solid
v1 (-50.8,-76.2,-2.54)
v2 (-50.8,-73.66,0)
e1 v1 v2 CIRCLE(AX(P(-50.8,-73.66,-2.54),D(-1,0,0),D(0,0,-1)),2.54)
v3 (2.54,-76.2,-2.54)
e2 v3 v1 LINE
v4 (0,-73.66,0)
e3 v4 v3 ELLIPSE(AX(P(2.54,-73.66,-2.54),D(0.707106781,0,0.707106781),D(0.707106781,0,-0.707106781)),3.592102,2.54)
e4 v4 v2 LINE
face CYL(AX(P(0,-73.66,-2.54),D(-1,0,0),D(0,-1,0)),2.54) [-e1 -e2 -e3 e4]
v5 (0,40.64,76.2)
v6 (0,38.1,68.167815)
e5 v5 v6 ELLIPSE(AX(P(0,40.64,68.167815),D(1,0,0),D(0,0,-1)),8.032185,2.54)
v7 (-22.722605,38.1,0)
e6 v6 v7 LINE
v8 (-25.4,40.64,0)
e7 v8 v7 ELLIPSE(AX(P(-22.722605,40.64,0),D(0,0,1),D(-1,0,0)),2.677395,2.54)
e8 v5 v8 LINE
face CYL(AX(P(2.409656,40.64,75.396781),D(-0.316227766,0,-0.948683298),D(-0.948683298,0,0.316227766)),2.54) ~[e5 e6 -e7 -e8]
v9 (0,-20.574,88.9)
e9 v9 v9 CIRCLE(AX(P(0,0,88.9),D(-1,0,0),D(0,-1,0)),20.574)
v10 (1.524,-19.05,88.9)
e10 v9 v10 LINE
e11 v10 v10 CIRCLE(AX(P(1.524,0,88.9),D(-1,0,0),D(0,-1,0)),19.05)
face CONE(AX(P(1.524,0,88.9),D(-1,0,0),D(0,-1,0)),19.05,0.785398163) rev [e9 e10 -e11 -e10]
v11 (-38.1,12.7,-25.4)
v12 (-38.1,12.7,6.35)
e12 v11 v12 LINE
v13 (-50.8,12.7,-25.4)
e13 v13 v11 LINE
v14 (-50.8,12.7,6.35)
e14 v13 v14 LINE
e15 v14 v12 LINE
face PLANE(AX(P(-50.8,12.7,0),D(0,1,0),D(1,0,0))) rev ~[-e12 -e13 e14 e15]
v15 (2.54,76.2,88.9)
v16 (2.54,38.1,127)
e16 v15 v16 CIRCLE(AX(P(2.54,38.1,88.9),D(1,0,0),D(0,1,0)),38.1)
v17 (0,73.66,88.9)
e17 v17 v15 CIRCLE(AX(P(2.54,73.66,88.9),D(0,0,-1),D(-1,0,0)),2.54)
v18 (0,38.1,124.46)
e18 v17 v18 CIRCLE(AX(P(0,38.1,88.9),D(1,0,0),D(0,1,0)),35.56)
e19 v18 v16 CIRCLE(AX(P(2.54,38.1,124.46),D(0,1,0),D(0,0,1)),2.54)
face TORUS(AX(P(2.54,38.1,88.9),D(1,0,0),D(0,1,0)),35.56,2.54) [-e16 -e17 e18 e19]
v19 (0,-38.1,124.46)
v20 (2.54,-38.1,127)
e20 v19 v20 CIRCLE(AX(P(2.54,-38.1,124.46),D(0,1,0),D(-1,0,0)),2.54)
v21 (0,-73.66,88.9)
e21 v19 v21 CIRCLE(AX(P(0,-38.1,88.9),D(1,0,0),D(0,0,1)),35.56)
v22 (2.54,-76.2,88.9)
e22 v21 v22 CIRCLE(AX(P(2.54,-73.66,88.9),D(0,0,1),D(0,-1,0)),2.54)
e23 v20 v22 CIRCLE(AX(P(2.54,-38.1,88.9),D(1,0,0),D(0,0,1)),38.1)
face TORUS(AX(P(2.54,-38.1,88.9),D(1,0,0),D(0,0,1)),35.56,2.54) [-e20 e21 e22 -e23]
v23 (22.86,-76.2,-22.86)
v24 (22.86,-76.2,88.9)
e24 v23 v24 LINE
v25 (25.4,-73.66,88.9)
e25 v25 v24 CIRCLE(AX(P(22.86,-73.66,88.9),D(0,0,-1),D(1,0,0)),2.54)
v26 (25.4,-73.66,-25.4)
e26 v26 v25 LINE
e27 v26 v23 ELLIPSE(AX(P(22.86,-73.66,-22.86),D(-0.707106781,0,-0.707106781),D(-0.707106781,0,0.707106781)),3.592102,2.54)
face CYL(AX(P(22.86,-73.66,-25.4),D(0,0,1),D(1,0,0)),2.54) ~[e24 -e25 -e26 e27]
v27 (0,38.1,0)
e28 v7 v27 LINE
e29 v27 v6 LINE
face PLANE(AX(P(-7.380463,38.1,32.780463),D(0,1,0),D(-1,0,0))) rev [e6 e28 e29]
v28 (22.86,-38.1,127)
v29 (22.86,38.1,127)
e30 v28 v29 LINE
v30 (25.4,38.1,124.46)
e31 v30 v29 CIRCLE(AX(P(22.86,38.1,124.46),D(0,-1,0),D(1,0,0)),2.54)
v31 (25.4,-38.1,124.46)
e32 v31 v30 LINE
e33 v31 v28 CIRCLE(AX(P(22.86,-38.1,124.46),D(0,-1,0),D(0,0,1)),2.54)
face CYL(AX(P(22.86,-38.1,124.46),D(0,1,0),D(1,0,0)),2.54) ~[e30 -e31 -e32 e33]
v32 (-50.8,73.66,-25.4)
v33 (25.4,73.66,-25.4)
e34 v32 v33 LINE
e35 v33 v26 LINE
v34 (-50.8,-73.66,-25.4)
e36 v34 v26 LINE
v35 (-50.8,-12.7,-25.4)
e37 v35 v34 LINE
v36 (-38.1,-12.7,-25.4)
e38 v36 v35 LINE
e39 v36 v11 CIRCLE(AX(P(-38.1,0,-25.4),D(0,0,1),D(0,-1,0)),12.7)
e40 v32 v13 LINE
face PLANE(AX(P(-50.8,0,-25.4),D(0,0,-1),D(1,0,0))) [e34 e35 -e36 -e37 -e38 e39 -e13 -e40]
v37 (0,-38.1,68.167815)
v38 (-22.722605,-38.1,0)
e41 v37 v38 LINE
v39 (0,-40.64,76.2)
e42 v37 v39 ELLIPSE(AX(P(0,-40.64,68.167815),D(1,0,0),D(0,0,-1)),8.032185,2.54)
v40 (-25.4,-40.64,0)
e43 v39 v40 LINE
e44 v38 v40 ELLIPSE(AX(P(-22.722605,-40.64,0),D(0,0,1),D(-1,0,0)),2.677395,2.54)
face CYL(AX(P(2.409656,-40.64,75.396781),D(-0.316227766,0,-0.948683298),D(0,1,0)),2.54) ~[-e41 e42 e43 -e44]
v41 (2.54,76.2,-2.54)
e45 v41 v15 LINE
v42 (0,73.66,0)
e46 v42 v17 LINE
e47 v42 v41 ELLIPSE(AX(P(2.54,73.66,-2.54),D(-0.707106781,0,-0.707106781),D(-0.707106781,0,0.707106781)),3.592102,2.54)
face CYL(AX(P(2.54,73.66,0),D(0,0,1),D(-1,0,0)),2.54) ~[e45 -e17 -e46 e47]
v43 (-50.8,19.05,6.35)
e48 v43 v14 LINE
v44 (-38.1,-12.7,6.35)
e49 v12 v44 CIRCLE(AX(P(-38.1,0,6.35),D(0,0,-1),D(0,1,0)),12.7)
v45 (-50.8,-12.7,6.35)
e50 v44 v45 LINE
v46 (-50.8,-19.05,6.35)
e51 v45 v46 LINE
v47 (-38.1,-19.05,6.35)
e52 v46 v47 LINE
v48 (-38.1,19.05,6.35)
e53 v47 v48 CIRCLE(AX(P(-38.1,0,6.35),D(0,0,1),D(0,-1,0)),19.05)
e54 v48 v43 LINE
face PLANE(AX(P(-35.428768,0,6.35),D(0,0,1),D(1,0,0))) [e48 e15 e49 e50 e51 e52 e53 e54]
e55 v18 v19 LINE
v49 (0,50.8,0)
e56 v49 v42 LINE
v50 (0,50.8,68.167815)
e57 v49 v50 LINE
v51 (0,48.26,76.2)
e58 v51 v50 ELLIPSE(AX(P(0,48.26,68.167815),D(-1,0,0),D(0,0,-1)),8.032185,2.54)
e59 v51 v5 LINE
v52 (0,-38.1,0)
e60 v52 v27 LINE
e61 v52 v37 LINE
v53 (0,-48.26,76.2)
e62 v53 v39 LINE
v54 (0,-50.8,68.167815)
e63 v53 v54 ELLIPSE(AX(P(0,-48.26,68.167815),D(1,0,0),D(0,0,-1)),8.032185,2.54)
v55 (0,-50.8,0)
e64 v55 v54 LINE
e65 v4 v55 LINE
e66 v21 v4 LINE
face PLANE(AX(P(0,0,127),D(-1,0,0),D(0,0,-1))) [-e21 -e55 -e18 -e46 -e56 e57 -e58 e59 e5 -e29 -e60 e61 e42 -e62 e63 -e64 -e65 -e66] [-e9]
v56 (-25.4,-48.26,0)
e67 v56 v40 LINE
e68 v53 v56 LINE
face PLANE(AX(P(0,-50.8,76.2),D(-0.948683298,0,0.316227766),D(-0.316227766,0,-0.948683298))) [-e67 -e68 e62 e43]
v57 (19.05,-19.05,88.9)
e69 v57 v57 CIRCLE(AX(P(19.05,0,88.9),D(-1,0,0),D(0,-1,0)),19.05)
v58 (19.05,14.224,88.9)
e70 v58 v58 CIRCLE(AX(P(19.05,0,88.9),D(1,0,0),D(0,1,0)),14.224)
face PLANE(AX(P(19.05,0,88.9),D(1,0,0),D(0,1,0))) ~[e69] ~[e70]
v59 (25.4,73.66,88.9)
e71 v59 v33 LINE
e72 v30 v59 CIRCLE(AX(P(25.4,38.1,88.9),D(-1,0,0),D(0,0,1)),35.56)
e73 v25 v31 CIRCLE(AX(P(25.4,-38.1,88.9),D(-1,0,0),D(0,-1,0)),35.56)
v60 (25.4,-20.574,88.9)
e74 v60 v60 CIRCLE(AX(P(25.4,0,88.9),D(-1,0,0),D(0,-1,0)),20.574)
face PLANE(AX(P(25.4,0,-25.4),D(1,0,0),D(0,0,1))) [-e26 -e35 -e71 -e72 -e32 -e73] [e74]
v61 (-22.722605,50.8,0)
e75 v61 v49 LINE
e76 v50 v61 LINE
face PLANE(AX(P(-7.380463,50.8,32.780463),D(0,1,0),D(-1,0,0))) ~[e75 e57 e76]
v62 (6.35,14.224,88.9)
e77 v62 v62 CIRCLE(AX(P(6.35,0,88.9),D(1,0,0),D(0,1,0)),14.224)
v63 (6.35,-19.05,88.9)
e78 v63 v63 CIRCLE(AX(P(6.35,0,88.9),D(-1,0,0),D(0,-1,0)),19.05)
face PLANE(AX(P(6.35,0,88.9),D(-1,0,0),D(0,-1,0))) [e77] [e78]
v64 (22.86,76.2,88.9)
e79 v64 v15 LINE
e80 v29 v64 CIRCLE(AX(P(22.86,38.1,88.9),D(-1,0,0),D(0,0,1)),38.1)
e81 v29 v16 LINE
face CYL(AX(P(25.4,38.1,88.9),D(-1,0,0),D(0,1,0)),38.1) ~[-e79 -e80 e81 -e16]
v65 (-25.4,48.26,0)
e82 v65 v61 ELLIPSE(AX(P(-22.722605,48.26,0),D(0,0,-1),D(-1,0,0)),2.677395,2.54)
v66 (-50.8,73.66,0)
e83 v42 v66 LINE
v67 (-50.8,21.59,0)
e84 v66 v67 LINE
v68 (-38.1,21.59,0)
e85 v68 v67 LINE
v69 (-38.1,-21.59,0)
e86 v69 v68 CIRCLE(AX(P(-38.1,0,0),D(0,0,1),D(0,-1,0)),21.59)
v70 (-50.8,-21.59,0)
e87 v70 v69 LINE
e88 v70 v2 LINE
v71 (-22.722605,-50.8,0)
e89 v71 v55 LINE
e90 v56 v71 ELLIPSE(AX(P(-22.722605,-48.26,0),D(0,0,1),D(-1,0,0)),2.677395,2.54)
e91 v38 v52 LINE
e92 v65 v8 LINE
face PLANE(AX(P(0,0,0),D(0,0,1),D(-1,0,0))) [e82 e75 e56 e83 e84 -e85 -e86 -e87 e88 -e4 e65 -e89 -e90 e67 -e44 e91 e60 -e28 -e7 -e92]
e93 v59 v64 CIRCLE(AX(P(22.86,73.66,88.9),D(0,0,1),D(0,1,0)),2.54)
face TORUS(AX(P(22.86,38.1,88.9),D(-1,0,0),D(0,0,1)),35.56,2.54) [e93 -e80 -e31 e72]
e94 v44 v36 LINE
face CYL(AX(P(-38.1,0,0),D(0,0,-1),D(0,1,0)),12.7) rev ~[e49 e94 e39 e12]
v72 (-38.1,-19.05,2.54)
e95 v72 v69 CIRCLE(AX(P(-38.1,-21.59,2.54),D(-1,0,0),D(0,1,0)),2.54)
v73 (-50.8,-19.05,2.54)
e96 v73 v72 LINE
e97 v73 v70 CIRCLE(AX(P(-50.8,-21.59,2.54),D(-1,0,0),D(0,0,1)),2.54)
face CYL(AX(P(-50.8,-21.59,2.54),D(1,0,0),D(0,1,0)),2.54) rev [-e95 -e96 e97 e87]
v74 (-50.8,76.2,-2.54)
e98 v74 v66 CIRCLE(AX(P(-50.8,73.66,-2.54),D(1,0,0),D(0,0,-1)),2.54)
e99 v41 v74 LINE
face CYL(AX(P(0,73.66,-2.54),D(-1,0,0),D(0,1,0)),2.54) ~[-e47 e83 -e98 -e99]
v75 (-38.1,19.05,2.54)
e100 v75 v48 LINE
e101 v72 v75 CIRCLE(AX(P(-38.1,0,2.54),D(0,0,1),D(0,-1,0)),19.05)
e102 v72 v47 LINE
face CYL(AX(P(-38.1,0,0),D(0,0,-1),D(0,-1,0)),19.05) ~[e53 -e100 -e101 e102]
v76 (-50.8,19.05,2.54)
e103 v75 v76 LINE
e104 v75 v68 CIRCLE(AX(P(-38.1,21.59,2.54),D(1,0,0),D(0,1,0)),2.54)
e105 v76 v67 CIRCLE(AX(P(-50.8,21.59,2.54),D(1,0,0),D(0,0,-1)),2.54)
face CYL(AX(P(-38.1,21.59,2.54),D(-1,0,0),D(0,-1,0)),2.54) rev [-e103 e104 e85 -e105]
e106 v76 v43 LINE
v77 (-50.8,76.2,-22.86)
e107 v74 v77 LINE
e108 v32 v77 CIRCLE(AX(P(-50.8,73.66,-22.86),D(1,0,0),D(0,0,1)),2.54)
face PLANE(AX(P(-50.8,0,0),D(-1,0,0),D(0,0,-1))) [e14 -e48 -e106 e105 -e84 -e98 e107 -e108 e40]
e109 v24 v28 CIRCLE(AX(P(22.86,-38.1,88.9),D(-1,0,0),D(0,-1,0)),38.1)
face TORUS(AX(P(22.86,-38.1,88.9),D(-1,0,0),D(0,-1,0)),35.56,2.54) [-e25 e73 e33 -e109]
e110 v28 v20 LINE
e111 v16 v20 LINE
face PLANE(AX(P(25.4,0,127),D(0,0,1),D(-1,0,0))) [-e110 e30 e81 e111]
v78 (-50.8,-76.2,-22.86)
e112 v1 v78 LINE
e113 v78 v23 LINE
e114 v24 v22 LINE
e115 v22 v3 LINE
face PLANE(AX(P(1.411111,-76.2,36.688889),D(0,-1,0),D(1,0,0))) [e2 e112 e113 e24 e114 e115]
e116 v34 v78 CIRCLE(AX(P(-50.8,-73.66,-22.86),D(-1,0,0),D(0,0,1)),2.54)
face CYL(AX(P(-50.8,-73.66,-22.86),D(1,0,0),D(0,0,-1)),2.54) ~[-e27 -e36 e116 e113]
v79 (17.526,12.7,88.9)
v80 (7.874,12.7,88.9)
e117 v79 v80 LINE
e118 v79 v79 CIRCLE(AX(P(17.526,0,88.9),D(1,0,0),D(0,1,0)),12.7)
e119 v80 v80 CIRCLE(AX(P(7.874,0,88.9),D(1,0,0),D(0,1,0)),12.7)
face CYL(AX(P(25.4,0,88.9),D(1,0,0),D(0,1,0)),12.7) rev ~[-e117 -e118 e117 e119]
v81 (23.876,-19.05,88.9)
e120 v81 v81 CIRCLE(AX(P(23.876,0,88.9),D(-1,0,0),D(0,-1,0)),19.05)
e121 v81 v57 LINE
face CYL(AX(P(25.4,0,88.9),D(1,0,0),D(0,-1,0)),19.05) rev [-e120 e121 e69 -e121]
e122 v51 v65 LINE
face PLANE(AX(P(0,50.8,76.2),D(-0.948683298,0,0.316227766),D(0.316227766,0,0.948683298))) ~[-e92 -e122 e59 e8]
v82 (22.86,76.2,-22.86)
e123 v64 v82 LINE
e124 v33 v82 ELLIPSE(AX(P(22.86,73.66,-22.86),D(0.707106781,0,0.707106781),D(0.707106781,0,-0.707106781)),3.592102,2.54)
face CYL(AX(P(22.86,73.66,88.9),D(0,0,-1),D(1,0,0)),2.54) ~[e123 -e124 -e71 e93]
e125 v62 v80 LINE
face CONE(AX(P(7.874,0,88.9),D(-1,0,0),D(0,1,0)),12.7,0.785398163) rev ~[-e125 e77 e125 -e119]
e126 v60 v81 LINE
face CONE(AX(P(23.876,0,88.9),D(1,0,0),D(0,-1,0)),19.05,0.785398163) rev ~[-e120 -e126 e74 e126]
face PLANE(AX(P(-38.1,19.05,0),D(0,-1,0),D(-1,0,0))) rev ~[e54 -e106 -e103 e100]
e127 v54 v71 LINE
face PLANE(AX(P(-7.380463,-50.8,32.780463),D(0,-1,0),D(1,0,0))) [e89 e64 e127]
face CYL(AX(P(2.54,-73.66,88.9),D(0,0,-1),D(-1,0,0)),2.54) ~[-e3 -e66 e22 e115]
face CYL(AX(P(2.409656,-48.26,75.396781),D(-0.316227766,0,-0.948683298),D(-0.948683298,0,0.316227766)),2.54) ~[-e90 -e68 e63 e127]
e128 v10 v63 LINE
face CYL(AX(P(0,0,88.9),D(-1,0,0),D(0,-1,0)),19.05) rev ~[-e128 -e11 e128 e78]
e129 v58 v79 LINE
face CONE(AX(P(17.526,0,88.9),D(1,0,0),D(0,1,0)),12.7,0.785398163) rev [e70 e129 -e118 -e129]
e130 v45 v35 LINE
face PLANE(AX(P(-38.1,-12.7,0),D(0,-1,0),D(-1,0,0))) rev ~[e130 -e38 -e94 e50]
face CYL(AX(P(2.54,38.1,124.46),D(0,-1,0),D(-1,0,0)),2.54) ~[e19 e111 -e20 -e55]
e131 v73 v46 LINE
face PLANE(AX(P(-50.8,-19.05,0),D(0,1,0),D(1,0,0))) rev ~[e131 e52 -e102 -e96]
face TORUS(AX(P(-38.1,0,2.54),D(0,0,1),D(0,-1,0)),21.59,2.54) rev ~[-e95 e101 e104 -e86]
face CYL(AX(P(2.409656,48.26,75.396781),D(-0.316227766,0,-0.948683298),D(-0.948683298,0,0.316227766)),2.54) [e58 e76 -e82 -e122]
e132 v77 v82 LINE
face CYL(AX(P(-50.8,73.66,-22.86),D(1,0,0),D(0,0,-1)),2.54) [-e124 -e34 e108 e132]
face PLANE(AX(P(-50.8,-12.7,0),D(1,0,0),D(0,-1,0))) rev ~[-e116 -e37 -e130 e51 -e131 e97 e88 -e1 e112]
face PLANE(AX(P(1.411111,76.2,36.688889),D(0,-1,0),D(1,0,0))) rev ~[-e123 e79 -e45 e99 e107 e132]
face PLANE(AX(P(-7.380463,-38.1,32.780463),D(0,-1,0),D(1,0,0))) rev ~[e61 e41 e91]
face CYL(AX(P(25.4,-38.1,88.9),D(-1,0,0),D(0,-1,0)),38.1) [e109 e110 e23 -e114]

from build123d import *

# Parameters (mm, degrees)
F1_DEPTH  = 76.2
F2_R      = 12.7
F3_DEPTH  = 76.201
F5_DEPTH  = 25.401
F7_R      = 19.05
F8_DEPTH  = 6.35
F12_START = -69.85
F12_DEPTH = 12.7
F13_R     = 38.1
F14_SIZE  = 1.524
F16_DEPTH = 6.35
F17_R     = 2.54


# Not quite as in the source:
# - a pattern or mirror of a feature is missing from the dataset's text; its kind, count and spacing are read off the source's solid


with BuildPart() as f1:
    # F0 (on Front) → F1 (new body, symmetric)
    with BuildSketch(Plane.XZ):
        Polygon((0, 0), (-50.8, 0), (-50.8, -25.4), (25.4, -25.4), (25.4, 127), (0, 127), align=None)
    extrude(amount=F1_DEPTH, both=True)

    # F2 (on face) → F3 (cut, through all)
    with BuildSketch(Plane.YZ.offset(25.4)):
        with Locations((0, 88.9)):
            Circle(F2_R)
    extrude(amount=-F3_DEPTH, mode=Mode.SUBTRACT)

    # F4 (on face) → F5 (cut, through all)
    with BuildSketch(Plane.XY):
        with BuildLine():
            Line((-50.8, -12.7), (-38.1, -12.7))
            ThreePointArc((-38.1, -12.7), (-25.4, 0), (-38.1, 12.7))
            Line((-38.1, 12.7), (-50.8, 12.7))
            Line((-50.8, 12.7), (-50.8, -12.7))
        make_face()
    extrude(amount=-F5_DEPTH, mode=Mode.SUBTRACT)

    # F7 (on face) → F8 (cut)
    with BuildSketch(Plane(origin=(0, 0, 0), x_dir=(0, -1, 0), z_dir=(-1, 0, 0))):
        with Locations((0, 88.9)):
            Circle(F7_R)
    f8 = extrude(amount=-F8_DEPTH, mode=Mode.SUBTRACT)

    # F8_copies: F8 across plane
    add(f8.mirror(Plane(origin=(12.7, 0, 0), x_dir=(0, 0, 1), z_dir=(1, 0, 0))), mode=Mode.SUBTRACT)

    # F11 (on offset) → F12 (join)
    with BuildSketch(Plane.XZ.offset(120.65).offset(F12_START)):
        Polygon((0, 0), (0, 76.2), (-25.4, 0), align=None)
    f12 = extrude(amount=-F12_DEPTH)

    # F12_copies: F12 across plane
    add(f12.mirror(Plane.ZX))

    # F13
    f13_edges = [f1.edges().sort_by_distance(p)[0] for p in [
        (12.7, 76.2, 127),
        (12.7, -76.2, 127),
    ]]
    fillet(f13_edges, radius=F13_R)

    # F14
    f14_edges = [f1.edges().sort_by_distance(p)[0] for p in [
        (6.35, -12.7, 88.9),
        (0, 19.05, 88.9),
        (25.4, 19.05, 88.9),
        (19.05, -12.7, 88.9),
    ]]
    chamfer(f14_edges, length=F14_SIZE)

    # F15 (on face) → F16 (join)
    with BuildSketch(Plane.XY):
        with BuildLine():
            Line((-50.8, -19.05), (-38.1, -19.05))
            ThreePointArc((-38.1, -19.05), (-19.05, 0), (-38.1, 19.05))
            Line((-38.1, 19.05), (-50.8, 19.05))
            Line((-50.8, 19.05), (-50.8, 12.7))
            Line((-50.8, 12.7), (-38.1, 12.7))
            ThreePointArc((-38.1, 12.7), (-25.4, 0), (-38.1, -12.7))
            Line((-38.1, -12.7), (-50.8, -12.7))
            Line((-50.8, -12.7), (-50.8, -19.05))
        make_face()
    extrude(amount=F16_DEPTH)

    # F17
    f17_edges = [f1.edges().sort_by_distance(p)[0] for p in [
        (-44.45, 19.05, 0),
        (-12.7, -38.1, 38.1),
        (-12.7, -50.8, 38.1),
        (0, -76.2, 44.45),
        (25.4, -76.2, 31.75),
        (-25.4, -76.2, 0),
        (-12.7, -76.2, -25.4),
        (-25.4, 76.2, 0),
        (-12.7, 76.2, -25.4),
        (25.4, 76.2, 31.75),
        (25.4, 65.040768, 115.840768),
        (25.4, 0, 127),
        (25.4, -65.040768, 115.840768),
        (0, -65.040768, 115.840768),
        (0, 0, 127),
        (0, 65.040768, 115.840768),
        (0, 76.2, 44.45),
        (-12.7, 50.8, 38.1),
        (-12.7, 38.1, 38.1),
        (-44.45, -19.05, 0),
        (-19.05, 0, 0),
    ]]
    fillet(f17_edges, radius=F17_R)


solid = f1.part
